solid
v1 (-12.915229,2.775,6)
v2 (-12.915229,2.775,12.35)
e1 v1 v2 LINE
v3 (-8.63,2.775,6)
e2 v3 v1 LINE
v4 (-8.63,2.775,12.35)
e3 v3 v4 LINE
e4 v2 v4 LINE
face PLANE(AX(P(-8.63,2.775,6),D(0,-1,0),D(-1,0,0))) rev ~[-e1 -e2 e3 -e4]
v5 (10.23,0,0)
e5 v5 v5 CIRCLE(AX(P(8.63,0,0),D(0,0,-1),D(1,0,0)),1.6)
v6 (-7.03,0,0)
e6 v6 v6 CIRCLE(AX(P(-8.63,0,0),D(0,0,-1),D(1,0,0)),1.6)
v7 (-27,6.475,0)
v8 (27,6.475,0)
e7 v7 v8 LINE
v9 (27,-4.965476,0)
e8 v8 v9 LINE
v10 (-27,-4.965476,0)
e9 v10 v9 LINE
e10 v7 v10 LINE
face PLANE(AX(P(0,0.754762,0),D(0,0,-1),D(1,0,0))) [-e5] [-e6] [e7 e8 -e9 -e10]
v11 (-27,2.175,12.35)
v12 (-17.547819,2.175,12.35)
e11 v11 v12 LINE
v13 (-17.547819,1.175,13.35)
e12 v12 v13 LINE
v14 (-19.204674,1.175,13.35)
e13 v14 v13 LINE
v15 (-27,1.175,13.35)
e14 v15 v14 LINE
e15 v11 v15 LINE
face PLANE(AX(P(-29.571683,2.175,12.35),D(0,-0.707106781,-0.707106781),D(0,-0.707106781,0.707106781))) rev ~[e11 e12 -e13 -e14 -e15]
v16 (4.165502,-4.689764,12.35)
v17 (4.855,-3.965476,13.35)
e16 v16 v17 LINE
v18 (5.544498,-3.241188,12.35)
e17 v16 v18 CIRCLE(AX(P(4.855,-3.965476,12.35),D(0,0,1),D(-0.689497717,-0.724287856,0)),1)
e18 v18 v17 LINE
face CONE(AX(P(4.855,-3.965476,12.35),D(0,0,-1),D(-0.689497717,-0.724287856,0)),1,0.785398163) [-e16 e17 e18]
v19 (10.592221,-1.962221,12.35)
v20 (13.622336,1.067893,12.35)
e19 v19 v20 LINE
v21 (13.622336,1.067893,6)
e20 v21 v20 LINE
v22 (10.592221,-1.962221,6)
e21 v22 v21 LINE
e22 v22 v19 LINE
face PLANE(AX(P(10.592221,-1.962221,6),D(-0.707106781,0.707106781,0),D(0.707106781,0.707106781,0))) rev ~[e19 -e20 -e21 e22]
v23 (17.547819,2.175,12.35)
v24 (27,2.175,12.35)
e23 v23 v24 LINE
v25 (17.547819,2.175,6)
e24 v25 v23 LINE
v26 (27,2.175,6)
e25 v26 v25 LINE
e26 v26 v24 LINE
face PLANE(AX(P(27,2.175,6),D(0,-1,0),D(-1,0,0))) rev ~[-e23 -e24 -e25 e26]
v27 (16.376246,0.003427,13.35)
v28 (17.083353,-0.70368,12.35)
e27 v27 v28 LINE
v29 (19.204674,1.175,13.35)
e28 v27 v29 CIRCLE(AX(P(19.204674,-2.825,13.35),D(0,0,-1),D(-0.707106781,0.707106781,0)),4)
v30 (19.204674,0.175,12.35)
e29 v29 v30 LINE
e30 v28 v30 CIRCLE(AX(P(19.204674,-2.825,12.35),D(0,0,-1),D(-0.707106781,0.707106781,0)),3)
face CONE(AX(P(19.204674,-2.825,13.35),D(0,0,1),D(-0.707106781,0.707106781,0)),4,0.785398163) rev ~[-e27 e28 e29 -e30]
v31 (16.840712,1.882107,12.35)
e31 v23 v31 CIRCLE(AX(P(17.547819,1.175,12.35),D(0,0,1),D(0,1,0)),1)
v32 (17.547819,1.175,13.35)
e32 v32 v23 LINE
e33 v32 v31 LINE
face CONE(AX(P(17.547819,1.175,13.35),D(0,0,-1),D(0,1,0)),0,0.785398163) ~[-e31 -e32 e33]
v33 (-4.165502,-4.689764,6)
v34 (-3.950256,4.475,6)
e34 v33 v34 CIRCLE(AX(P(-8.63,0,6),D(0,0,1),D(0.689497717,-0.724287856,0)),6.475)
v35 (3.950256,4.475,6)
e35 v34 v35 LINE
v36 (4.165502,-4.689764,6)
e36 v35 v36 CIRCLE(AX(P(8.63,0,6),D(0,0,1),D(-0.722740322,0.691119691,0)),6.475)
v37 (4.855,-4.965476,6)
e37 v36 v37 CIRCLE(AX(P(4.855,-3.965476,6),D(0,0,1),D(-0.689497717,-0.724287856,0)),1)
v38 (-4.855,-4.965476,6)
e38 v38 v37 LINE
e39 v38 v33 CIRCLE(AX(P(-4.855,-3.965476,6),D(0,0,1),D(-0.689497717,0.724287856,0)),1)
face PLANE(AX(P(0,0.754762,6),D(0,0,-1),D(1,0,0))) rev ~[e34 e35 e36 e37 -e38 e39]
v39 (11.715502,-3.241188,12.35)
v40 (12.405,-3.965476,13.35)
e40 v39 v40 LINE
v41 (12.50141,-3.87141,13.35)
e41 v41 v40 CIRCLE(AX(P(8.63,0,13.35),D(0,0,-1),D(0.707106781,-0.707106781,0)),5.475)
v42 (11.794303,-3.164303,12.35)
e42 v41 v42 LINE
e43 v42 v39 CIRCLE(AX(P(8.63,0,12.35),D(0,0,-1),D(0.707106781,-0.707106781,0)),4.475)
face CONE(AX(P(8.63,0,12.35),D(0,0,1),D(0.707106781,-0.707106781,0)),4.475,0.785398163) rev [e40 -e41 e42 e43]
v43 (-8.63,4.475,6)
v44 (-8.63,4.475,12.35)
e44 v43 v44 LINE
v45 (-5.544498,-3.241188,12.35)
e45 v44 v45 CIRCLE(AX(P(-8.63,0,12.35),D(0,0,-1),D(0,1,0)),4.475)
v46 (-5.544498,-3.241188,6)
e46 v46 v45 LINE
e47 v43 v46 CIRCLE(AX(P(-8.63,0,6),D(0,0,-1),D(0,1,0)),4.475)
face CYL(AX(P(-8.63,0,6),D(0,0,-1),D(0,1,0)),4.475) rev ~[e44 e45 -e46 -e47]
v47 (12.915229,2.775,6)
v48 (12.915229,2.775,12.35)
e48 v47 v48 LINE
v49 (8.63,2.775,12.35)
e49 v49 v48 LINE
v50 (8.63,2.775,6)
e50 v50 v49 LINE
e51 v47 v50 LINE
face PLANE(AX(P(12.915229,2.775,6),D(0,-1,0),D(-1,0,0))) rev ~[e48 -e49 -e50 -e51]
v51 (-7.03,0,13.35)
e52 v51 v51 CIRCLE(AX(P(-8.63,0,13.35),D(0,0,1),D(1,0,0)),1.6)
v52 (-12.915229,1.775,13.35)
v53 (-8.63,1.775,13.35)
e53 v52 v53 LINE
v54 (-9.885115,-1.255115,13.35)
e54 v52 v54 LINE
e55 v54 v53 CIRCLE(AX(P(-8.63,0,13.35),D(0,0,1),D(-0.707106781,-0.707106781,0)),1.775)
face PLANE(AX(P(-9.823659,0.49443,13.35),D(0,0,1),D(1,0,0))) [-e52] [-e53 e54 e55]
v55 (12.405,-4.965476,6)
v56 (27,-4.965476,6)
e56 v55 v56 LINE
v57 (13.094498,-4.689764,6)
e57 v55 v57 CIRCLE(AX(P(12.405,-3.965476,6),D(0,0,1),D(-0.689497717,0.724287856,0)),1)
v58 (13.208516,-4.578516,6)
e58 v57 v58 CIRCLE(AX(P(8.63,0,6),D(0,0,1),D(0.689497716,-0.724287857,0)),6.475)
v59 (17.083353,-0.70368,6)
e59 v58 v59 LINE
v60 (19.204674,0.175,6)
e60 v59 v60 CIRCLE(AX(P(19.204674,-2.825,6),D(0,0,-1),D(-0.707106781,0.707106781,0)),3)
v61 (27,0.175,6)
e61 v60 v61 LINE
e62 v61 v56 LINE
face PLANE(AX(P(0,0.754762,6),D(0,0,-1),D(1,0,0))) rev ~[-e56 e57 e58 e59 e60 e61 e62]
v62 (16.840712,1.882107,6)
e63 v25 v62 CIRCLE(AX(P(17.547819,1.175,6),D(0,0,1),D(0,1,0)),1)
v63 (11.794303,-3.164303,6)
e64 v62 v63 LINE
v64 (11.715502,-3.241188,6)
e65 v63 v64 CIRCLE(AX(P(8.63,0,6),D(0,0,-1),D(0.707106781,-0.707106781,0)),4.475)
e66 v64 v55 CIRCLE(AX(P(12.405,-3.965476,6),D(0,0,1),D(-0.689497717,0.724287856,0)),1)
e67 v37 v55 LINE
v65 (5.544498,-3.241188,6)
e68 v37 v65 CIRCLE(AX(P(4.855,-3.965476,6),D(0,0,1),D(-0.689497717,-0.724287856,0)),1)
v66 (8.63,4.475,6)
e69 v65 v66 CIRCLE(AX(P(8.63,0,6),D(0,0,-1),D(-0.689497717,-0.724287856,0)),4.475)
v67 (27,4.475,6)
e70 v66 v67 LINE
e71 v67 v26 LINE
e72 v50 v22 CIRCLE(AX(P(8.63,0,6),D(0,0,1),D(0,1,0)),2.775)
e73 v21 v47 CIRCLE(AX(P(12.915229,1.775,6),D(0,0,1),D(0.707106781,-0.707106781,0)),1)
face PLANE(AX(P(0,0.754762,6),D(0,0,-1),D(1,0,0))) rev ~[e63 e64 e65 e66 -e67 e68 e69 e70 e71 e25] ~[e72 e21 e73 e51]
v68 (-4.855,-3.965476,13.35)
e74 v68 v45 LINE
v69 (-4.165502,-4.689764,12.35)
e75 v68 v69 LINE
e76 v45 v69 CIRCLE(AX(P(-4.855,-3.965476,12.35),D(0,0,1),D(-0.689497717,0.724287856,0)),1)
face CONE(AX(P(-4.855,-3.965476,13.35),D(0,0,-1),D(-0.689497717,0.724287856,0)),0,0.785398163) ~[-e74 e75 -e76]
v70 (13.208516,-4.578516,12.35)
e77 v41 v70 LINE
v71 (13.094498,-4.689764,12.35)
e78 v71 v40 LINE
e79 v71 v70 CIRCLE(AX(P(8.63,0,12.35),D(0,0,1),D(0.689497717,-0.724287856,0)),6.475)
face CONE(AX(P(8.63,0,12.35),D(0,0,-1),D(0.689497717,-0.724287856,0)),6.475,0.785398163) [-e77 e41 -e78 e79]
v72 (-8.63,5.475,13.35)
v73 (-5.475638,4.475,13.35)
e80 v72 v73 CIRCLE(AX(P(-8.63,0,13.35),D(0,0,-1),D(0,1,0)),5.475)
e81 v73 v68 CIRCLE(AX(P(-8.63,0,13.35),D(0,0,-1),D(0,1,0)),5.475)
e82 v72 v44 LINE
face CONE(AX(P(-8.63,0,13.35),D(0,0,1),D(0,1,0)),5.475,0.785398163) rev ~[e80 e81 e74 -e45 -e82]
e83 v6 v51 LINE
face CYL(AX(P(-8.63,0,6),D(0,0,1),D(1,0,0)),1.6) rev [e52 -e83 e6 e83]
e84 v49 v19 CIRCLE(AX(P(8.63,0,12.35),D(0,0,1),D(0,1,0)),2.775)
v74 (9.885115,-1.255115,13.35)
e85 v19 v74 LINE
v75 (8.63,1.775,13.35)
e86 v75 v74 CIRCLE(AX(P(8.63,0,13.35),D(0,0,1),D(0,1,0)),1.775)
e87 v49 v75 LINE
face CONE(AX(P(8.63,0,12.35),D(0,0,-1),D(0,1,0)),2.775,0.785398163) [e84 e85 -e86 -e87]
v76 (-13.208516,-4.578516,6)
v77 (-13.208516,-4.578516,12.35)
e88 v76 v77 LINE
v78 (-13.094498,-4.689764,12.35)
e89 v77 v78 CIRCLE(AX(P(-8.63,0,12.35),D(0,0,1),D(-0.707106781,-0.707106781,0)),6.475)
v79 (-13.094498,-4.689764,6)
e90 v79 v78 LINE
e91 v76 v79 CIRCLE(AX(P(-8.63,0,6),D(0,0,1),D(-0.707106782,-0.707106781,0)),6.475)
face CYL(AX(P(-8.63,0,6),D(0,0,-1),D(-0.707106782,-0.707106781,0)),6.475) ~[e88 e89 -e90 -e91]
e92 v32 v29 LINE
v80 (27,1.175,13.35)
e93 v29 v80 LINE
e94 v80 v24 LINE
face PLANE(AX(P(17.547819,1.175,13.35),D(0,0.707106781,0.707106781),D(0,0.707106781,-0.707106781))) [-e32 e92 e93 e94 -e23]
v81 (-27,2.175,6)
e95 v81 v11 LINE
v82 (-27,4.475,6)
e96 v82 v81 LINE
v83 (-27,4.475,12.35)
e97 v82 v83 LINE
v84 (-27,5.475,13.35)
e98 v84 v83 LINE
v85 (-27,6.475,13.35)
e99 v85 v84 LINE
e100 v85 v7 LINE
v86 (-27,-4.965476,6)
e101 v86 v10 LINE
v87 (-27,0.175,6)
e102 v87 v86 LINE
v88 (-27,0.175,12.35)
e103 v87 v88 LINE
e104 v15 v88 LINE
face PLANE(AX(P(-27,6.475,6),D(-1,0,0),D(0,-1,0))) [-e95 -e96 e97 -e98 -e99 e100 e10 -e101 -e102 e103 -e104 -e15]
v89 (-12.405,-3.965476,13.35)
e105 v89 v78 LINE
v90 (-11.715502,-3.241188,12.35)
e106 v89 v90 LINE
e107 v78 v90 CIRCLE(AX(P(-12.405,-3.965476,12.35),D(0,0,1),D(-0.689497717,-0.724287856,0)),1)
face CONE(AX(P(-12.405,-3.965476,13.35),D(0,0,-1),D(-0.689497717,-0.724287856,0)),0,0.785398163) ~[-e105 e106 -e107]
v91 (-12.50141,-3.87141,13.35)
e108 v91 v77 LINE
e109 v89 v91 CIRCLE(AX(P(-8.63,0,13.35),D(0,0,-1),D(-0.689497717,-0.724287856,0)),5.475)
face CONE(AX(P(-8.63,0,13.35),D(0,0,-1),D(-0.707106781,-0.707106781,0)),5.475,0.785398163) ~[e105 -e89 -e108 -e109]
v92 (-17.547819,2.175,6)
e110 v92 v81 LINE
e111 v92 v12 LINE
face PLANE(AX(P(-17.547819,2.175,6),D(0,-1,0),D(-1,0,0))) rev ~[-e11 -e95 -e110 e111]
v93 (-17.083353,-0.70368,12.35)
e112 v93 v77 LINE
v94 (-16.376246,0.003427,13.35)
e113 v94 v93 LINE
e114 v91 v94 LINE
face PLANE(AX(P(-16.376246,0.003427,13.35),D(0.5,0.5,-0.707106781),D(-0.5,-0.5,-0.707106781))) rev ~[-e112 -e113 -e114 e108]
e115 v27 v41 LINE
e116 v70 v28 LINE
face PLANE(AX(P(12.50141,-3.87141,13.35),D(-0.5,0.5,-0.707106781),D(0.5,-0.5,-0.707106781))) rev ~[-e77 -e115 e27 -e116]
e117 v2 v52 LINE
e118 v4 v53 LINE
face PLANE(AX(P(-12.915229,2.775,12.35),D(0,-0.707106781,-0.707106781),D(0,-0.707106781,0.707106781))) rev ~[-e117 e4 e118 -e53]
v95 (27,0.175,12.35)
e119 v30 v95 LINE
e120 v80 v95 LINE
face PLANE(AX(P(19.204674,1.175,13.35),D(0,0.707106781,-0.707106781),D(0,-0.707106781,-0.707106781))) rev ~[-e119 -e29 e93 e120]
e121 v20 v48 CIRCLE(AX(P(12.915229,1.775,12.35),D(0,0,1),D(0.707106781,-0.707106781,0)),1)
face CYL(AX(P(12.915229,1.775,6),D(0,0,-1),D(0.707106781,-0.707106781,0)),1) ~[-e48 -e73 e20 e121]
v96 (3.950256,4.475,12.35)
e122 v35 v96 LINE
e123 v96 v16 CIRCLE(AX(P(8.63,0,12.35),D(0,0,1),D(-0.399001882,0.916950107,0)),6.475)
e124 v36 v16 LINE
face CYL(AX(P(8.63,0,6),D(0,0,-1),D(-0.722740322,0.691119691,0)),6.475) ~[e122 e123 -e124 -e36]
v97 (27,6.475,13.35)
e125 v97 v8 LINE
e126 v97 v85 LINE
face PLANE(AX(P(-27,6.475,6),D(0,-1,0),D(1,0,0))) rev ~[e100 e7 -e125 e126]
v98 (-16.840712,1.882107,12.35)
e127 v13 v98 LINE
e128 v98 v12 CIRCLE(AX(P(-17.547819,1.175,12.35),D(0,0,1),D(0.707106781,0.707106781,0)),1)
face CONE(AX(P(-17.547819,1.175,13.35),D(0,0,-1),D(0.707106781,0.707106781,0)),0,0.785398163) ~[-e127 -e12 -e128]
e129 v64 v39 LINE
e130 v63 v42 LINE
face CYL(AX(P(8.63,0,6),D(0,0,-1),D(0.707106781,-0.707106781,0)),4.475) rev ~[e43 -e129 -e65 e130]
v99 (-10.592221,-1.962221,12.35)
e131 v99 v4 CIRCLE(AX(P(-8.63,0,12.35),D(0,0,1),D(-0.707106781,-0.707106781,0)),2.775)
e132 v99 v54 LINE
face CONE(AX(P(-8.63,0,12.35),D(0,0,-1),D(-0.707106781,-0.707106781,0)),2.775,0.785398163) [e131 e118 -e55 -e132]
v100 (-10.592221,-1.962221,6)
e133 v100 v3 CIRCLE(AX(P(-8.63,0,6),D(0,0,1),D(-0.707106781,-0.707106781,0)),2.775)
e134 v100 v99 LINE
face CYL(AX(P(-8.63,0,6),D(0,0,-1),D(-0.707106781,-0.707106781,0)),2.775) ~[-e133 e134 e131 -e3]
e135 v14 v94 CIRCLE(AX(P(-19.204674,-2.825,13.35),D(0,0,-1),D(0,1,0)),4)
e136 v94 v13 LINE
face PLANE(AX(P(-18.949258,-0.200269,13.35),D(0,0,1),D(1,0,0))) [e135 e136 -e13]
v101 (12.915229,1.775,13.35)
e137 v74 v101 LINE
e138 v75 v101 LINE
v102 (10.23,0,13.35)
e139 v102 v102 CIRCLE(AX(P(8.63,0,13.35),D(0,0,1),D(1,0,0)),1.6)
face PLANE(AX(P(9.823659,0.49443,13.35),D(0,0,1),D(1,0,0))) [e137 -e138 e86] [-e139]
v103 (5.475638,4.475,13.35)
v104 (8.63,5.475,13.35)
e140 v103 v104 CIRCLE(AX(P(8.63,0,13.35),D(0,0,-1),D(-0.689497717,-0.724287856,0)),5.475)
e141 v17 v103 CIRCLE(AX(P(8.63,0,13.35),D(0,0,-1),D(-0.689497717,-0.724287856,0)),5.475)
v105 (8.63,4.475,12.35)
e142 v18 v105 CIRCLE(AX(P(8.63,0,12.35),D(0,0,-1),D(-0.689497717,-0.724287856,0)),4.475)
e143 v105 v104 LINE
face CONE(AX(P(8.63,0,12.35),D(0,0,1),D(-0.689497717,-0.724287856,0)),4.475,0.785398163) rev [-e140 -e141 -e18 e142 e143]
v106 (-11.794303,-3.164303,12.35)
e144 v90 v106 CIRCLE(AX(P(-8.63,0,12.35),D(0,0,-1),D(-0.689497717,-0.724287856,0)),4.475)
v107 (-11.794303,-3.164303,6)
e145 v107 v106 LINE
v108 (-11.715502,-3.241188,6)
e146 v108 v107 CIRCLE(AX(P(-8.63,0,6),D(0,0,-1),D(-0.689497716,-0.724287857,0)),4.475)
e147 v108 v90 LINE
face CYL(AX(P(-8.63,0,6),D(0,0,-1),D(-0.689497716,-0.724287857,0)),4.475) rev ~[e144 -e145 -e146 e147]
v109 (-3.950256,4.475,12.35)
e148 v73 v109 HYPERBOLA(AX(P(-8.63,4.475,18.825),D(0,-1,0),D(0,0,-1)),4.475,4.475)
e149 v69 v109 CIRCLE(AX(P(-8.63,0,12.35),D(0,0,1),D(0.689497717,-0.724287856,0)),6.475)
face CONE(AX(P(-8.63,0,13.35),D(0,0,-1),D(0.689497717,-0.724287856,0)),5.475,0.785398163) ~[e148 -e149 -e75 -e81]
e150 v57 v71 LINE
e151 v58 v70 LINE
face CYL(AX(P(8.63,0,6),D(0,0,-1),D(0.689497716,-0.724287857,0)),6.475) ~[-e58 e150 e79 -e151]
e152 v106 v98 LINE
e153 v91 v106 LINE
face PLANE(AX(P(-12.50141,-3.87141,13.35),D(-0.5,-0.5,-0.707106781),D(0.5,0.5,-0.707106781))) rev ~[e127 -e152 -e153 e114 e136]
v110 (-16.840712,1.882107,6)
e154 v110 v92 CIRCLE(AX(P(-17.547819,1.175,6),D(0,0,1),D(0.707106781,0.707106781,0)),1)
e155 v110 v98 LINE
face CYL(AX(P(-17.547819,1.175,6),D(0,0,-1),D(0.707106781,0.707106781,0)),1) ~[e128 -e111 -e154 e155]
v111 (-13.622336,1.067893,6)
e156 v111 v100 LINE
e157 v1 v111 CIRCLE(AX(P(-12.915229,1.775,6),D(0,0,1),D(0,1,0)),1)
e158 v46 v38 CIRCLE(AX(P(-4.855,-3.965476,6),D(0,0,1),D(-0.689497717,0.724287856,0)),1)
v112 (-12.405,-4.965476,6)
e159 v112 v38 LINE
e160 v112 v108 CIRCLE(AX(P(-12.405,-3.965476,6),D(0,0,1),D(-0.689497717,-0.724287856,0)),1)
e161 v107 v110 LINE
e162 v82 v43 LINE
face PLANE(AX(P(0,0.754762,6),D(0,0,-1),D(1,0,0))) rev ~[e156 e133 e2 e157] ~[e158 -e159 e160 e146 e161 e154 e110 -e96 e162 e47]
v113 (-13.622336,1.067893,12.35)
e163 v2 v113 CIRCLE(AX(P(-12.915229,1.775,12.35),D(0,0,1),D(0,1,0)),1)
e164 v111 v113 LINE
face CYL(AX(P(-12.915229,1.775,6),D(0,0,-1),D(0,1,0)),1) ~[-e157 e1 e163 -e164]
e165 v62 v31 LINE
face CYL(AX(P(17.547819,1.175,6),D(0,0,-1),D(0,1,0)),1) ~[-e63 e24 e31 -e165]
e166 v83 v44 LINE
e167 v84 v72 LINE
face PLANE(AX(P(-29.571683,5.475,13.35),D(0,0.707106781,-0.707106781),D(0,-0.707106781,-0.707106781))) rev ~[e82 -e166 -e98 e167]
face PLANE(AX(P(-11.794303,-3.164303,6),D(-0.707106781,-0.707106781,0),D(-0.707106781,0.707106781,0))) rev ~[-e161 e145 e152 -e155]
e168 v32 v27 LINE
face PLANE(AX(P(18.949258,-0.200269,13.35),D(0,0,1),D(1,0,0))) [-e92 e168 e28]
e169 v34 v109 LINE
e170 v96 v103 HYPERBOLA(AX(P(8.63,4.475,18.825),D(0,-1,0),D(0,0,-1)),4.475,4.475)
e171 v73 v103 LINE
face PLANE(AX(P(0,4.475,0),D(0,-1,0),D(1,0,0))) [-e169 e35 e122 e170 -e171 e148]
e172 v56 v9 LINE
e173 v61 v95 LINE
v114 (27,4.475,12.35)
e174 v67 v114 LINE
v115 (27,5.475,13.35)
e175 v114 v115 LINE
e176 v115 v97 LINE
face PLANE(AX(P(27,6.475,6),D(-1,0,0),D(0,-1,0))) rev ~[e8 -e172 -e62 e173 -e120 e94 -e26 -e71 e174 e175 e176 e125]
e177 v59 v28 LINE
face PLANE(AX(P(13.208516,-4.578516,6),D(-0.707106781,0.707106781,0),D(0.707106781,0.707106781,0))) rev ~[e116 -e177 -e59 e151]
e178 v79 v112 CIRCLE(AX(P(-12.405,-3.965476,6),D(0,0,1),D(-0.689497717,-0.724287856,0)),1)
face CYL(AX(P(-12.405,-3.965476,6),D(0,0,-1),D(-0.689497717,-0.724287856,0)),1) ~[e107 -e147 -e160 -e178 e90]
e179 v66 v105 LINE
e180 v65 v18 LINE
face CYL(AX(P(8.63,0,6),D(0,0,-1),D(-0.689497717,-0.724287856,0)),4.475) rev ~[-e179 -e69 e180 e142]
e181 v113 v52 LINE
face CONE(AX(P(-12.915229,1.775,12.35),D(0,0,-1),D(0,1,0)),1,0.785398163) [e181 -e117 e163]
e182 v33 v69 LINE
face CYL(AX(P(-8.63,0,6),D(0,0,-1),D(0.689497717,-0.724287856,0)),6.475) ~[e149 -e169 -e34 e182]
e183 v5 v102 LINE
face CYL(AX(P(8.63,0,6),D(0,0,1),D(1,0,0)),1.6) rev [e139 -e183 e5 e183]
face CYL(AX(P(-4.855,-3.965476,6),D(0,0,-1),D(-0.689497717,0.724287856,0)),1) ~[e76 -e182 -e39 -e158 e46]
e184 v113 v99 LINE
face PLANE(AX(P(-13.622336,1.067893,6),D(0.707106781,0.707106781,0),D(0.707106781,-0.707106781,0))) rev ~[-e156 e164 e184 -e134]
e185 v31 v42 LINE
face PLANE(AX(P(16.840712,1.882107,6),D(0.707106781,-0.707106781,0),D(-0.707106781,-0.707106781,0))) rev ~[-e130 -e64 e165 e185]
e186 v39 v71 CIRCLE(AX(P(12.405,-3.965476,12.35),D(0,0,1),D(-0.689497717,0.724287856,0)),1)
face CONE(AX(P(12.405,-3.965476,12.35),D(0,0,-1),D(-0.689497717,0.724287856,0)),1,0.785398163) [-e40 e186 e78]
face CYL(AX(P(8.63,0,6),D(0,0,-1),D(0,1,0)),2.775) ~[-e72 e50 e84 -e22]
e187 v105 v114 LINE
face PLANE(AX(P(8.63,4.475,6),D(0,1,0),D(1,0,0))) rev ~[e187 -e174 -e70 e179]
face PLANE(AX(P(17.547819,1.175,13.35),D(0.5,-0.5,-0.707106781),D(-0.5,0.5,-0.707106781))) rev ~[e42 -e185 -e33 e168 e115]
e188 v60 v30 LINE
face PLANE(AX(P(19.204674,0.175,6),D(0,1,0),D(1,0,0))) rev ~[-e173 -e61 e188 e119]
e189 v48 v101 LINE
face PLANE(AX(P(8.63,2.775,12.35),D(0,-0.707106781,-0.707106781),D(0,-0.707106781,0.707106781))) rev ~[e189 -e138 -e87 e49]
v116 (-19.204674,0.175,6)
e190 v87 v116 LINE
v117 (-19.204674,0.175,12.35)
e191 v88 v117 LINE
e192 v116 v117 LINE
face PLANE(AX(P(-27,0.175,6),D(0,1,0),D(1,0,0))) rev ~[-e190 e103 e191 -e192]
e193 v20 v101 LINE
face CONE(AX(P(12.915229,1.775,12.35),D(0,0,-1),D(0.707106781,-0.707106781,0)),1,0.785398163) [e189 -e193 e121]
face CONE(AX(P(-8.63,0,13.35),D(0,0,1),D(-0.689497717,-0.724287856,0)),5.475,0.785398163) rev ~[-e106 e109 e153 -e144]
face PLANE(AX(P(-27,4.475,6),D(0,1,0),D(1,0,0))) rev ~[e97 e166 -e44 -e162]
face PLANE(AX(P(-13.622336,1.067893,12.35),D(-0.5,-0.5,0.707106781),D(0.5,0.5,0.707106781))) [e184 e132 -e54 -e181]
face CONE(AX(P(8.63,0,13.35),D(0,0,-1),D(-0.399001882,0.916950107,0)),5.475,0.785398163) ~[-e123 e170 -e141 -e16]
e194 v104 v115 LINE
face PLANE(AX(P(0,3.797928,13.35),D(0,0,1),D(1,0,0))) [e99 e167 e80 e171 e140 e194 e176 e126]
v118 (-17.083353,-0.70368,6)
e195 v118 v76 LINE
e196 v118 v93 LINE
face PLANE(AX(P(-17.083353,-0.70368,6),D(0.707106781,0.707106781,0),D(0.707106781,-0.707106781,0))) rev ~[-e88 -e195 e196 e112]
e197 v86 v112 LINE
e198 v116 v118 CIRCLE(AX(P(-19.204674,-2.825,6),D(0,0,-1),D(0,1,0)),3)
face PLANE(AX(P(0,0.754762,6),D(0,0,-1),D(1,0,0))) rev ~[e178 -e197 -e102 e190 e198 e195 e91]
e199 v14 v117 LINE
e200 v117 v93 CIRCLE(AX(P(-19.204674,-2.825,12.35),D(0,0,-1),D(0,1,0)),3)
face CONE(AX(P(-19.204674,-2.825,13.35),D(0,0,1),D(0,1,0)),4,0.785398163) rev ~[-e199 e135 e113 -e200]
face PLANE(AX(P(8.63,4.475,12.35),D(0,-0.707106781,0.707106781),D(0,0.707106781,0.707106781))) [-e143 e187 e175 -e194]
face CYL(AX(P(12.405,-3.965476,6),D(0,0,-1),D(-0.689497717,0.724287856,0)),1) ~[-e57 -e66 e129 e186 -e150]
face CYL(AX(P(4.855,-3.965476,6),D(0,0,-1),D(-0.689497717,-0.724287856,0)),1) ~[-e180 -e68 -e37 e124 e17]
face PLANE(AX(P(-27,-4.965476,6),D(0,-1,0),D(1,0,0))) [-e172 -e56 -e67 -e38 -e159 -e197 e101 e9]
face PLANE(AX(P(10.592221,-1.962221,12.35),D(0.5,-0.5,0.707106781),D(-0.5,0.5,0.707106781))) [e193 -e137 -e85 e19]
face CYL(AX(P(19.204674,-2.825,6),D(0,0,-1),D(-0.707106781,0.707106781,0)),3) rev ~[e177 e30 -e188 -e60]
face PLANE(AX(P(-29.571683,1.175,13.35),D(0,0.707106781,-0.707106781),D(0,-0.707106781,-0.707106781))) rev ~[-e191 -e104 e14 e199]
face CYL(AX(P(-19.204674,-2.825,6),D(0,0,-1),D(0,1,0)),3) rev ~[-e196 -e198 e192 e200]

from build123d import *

# Parameters (mm, degrees)
F2_DEPTH     = 7.35
F1_R         = 1.6
F3_W         = 54
F3_H         = 11.4404760118
F3_R         = 1.6
F4_DEPTH     = 6
F5_T1_DEPTH  = 12.023863734
F5_T3_DEPTH  = 20.941682988
F5_T5_DEPTH  = 20.941682988
F5_T7_DEPTH  = 12.023863734
F5_T9_DEPTH  = 4.2852290732
F5_T11_DEPTH = 4.2852290732
F5_T13_DEPTH = 4.2852290732
F5_T15_DEPTH = 4.2852290732
F5_T17_DEPTH = 7.1367009358
F5_T19_DEPTH = 5.4798466863
F5_T21_DEPTH = 10.3670094845
F5_T23_DEPTH = 7.1367009358
F5_T25_DEPTH = 5.4798466863
F5_T27_DEPTH = 10.3670094845
F5_T30_ANGLE = 135
F5_T32_ANGLE = 225
F5_T34_ANGLE = 225
F5_T36_ANGLE = 135
F5_T38_ANGLE = 45
F5_T40_ANGLE = 1.4096380503
F5_T42_ANGLE = 180
F5_T44_ANGLE = 1.4096380503
F5_T46_ANGLE = 45
F5_T48_ANGLE = 136.4096380503
F5_T50_ANGLE = 180
F5_T54_ANGLE = 112.8938419293
F5_T57_ANGLE = 136.4096380503
F5_T59_ANGLE = 180
F5_T63_ANGLE = 112.8938419293
F5_T66_ANGLE = 45
F5_T68_ANGLE = 1.4096380503
F5_T70_ANGLE = 180
F5_T72_ANGLE = 1.4096380503
F5_T74_ANGLE = 45


# Not quite as in the source:
# - a fillet or chamfer that OpenCascade refuses, or shapes differently, is made with other operations: its cross-section is extruded or revolved along the edge and cut away or added


with BuildPart() as f2:
    # F1 (on offset) → F2 (new body)
    with BuildSketch(Plane.XY.offset(6)):
        with BuildLine():
            Line((27, 6.475), (-27, 6.475))
            Line((-27, 6.475), (-27, 4.475))
            Line((-27, 4.475), (-8.63, 4.475))
            ThreePointArc((-8.63, 4.475), (-4.474886163, 1.6615215923), (-5.5444977169, -3.2411881557))
            ThreePointArc((-5.5444977169, -3.2411881557), (-5.579287856, -4.6549737287), (-4.1655022831, -4.6897638678))
            ThreePointArc((-4.1655022831, -4.6897638678), (-2.1567850781, -0.1520314948), (-3.9502564173, 4.475))
            Line((-3.9502564173, 4.475), (3.9502564173, 4.475))
            ThreePointArc((3.9502564173, 4.475), (2.1567850781, -0.1520314948), (4.1655022831, -4.6897638678))
            ThreePointArc((4.1655022831, -4.6897638678), (5.579287856, -4.6549737287), (5.5444977169, -3.2411881557))
            ThreePointArc((5.5444977169, -3.2411881557), (4.474886163, 1.6615215923), (8.63, 4.475))
            Line((8.63, 4.475), (27, 4.475))
            Line((27, 4.475), (27, 6.475))
        make_face()
    extrude(amount=F2_DEPTH)



with BuildPart() as f2b:
    # F1 (on offset) → F2, piece 2 (new body)
    with BuildSketch(Plane.XY.offset(6)):
        with BuildLine():
            Line((-13.6223358544, 1.0678932188), (-10.5922213178, -1.9622213178))
            ThreePointArc((-10.5922213178, -1.9622213178), (-6.0662342973, -1.0619465248), (-8.63, 2.775))
            Line((-8.63, 2.775), (-12.9152290732, 2.775))
            ThreePointArc((-12.9152290732, 2.775), (-13.8391086057, 2.1576834324), (-13.6223358544, 1.0678932188))
        make_face()
        with Locations((-8.63, 0)):
            Circle(F1_R, mode=Mode.SUBTRACT)
    extrude(amount=F2_DEPTH)


with BuildPart() as f2c:
    # F1 (on offset) → F2, piece 3 (new body)
    with BuildSketch(Plane.XY.offset(6)):
        with BuildLine():
            ThreePointArc((8.63, 2.775), (6.0662342973, -1.0619465248), (10.5922213178, -1.9622213178))
            Line((10.5922213178, -1.9622213178), (13.6223358544, 1.0678932188))
            ThreePointArc((13.6223358544, 1.0678932188), (13.8391086057, 2.1576834324), (12.9152290732, 2.775))
            Line((12.9152290732, 2.775), (8.63, 2.775))
        make_face()
        with Locations((8.63, 0)):
            Circle(F1_R, mode=Mode.SUBTRACT)
    extrude(amount=F2_DEPTH)


with BuildPart() as f2d:
    # F1 (on offset) → F2, piece 4 (new body)
    with BuildSketch(Plane.XY.offset(6)):
        with BuildLine():
            Line((-17.547819254, 2.175), (-27, 2.175))
            Line((-27, 2.175), (-27, 0.175))
            Line((-27, 0.175), (-19.2046735035, 0.175))
            ThreePointArc((-19.2046735035, 0.175), (-18.0566232064, -0.0533614025), (-17.0833531599, -0.7036796564))
            Line((-17.0833531599, -0.7036796564), (-13.2085164082, -4.5785164082))
            ThreePointArc((-13.2085164082, -4.5785164082), (-13.1518491921, -4.6344907902), (-13.0944977169, -4.6897638678))
            ThreePointArc((-13.0944977169, -4.6897638678), (-11.680712144, -4.6549737287), (-11.7155022831, -3.2411881557))
            ThreePointArc((-11.7155022831, -3.2411881557), (-11.7551390169, -3.2029878434), (-11.7943028458, -3.1643028458))
            Line((-11.7943028458, -3.1643028458), (-16.8407124728, 1.8821067812))
            ThreePointArc((-16.8407124728, 1.8821067812), (-17.1651358216, 2.0988795325), (-17.547819254, 2.175))
        make_face()
    extrude(amount=F2_DEPTH)


with BuildPart() as f2e:
    # F1 (on offset) → F2, piece 5 (new body)
    with BuildSketch(Plane.XY.offset(6)):
        with BuildLine():
            ThreePointArc((13.0944977169, -4.6897638678), (13.1518491921, -4.6344907902), (13.2085164082, -4.5785164082))
            Line((13.2085164082, -4.5785164082), (17.0833531599, -0.7036796564))
            ThreePointArc((17.0833531599, -0.7036796564), (18.0566232064, -0.0533614025), (19.2046735035, 0.175))
            Line((19.2046735035, 0.175), (27, 0.175))
            Line((27, 0.175), (27, 2.175))
            Line((27, 2.175), (17.547819254, 2.175))
            ThreePointArc((17.547819254, 2.175), (17.1651358216, 2.0988795325), (16.8407124728, 1.8821067812))
            Line((16.8407124728, 1.8821067812), (11.7943028458, -3.1643028458))
            ThreePointArc((11.7943028458, -3.1643028458), (11.7551390169, -3.2029878434), (11.7155022831, -3.2411881557))
            ThreePointArc((11.7155022831, -3.2411881557), (11.680712144, -4.6549737287), (13.0944977169, -4.6897638678))
        make_face()
    extrude(amount=F2_DEPTH)


with BuildPart() as f2_1:
    add(f2.part)

    add(f2b.part)  # F4 merges F2b

    add(f2c.part)  # F4 merges F2c

    add(f2d.part)  # F4 merges F2d

    add(f2e.part)  # F4 merges F2e
    # F3 (on face) → F4 (join, through all)
    with BuildSketch(Plane(origin=(0, 0, 6), x_dir=(1, 0, 0), z_dir=(0, 0, -1))):
        with Locations((0, -0.7547619941)):
            Rectangle(F3_W, F3_H)
        with Locations((-8.63, 0)):
            Circle(F3_R, mode=Mode.SUBTRACT)
        with Locations((8.63, 0)):
            Circle(F3_R, mode=Mode.SUBTRACT)
    extrude(amount=F4_DEPTH)

    # F5: chamfer of 1 on 6 edges, made by hand

    # F5_s2 → F5_t1 (cut)
    with BuildSketch(Plane.YZ.offset(-29.571682988)):
        Polygon((2.175, 12.35), (1.175, 13.35), (2.175, 13.35), align=None)
    extrude(amount=F5_T1_DEPTH, mode=Mode.SUBTRACT)

    # F5_s4 → F5_t3 (cut)
    with BuildSketch(Plane.YZ.offset(-29.571682988)):
        Polygon((5.475, 13.35), (4.475, 12.35), (4.475, 13.35), align=None)
    extrude(amount=F5_T3_DEPTH, mode=Mode.SUBTRACT)

    # F5_s6 → F5_t5 (cut)
    with BuildSketch(Plane.YZ.offset(8.63)):
        Polygon((4.475, 12.35), (5.475, 13.35), (4.475, 13.35), align=None)
    extrude(amount=F5_T5_DEPTH, mode=Mode.SUBTRACT)

    # F5_s8 → F5_t7 (cut)
    with BuildSketch(Plane.YZ.offset(17.547819254)):
        Polygon((1.175, 13.35), (2.175, 12.35), (2.175, 13.35), align=None)
    extrude(amount=F5_T7_DEPTH, mode=Mode.SUBTRACT)

    # F5_s10 → F5_t9 (cut)
    with BuildSketch(Plane.YZ.offset(-12.9152290732)):
        Polygon((2.775, 12.35), (1.775, 13.35), (2.775, 13.35), align=None)
    extrude(amount=F5_T9_DEPTH, mode=Mode.SUBTRACT)

    # F5_s12 → F5_t11 (cut)
    with BuildSketch(Plane.YZ.offset(8.63)):
        Polygon((2.775, 12.35), (1.775, 13.35), (2.775, 13.35), align=None)
    extrude(amount=F5_T11_DEPTH, mode=Mode.SUBTRACT)

    # F5_s14 → F5_t13 (cut)
    with BuildSketch(Plane(origin=(4.315, 4.315, 0), x_dir=(0, 0, 1), z_dir=(0.7071067812, 0.7071067812, 0))):
        Polygon((12.35, 8.8773315216), (13.35, 7.8773315216), (13.35, 8.8773315216), align=None)
    extrude(amount=F5_T13_DEPTH, mode=Mode.SUBTRACT)

    # F5_s16 → F5_t15 (cut)
    with BuildSketch(Plane(origin=(-7.3451145366, 7.3451145366, 0), x_dir=(0, 0, 1), z_dir=(0.7071067812, -0.7071067812, 0))):
        Polygon((12.35, 8.8773315216), (13.35, 7.8773315216), (13.35, 8.8773315216), align=None)
    extrude(amount=F5_T15_DEPTH, mode=Mode.SUBTRACT)

    # F5_s18 → F5_t17 (cut)
    with BuildSketch(Plane(origin=(9.361409627, 9.361409627, 0), x_dir=(0, 0, 1), z_dir=(-0.7071067812, -0.7071067812, 0))):
        Polygon((13.35, -11.5773315216), (12.35, -10.5773315216), (13.35, -10.5773315216), align=None)
    extrude(amount=F5_T17_DEPTH, mode=Mode.SUBTRACT)

    # F5_s20 → F5_t19 (cut)
    with BuildSketch(Plane(origin=(4.315, 4.315, 0), x_dir=(0, 0, 1), z_dir=(0.7071067812, 0.7071067812, 0))):
        Polygon((13.35, 11.5773315216), (12.35, 12.5773315216), (13.35, 12.5773315216), align=None)
    extrude(amount=F5_T19_DEPTH, mode=Mode.SUBTRACT)

    # F5_s22 → F5_t21 (cut)
    with BuildSketch(Plane.YZ.offset(19.2046735035)):
        Polygon((1.175, 13.35), (0.175, 12.35), (0.175, 13.35), align=None)
    extrude(amount=F5_T21_DEPTH, mode=Mode.SUBTRACT)

    # F5_s24 → F5_t23 (cut)
    with BuildSketch(Plane(origin=(-4.315, 4.315, 0), x_dir=(0, 0, 1), z_dir=(-0.7071067812, 0.7071067812, 0))):
        Polygon((13.35, -11.5773315216), (12.35, -10.5773315216), (13.35, -10.5773315216), align=None)
    extrude(amount=F5_T23_DEPTH, mode=Mode.SUBTRACT)

    # F5_s26 → F5_t25 (cut)
    with BuildSketch(Plane(origin=(-8.1898367517, 8.1898367517, 0), x_dir=(0, 0, 1), z_dir=(0.7071067812, -0.7071067812, 0))):
        Polygon((13.35, 11.5773315216), (12.35, 12.5773315216), (13.35, 12.5773315216), align=None)
    extrude(amount=F5_T25_DEPTH, mode=Mode.SUBTRACT)

    # F5_s28 → F5_t27 (cut)
    with BuildSketch(Plane.YZ.offset(-29.571682988)):
        Polygon((1.175, 13.35), (0.175, 12.35), (0.175, 13.35), align=None)
    extrude(amount=F5_T27_DEPTH, mode=Mode.SUBTRACT)

    # F5_s29 → F5_t30 (revolve, cut)
    with BuildSketch(Plane(origin=(7.3451145366, 7.3451145366, 0), x_dir=(0, 0, 1), z_dir=(-0.7071067812, -0.7071067812, 0))):
        Polygon((12.35, -8.8773315216), (13.35, -7.8773315216), (13.35, -8.8773315216), align=None)
    revolve(axis=Axis((12.9152290732, 1.775, 13.35), (0, 0, 1)), revolution_arc=F5_T30_ANGLE, mode=Mode.SUBTRACT)

    # F5_s31 → F5_t32 (revolve, cut)
    with BuildSketch(Plane.YZ.offset(8.63)):
        Polygon((2.775, 12.35), (1.775, 13.35), (2.775, 13.35), align=None)
    revolve(axis=Axis((8.63, 0, 13.35), (0, 0, 1)), revolution_arc=F5_T32_ANGLE, mode=Mode.SUBTRACT)

    # F5_s33 → F5_t34 (revolve, cut)
    with BuildSketch(Plane(origin=(-4.315, 4.315, 0), x_dir=(0, 0, 1), z_dir=(-0.7071067812, 0.7071067812, 0))):
        Polygon((12.35, -8.8773315216), (13.35, -7.8773315216), (13.35, -8.8773315216), align=None)
    revolve(axis=Axis((-8.63, 0, 13.35), (0, 0, 1)), revolution_arc=F5_T34_ANGLE, mode=Mode.SUBTRACT)

    # F5_s35 → F5_t36 (revolve, cut)
    with BuildSketch(Plane.YZ.offset(-12.9152290732)):
        Polygon((2.775, 12.35), (1.775, 13.35), (2.775, 13.35), align=None)
    revolve(axis=Axis((-12.9152290732, 1.775, 13.35), (0, 0, 1)), revolution_arc=F5_T36_ANGLE, mode=Mode.SUBTRACT)

    # F5_s37 → F5_t38 (revolve, cut)
    with BuildSketch(Plane.YZ.offset(17.547819254)):
        Polygon((1.175, 13.35), (2.175, 12.35), (2.175, 13.35), align=None)
    revolve(axis=Axis((17.547819254, 1.175, 13.35), (0, 0, 1)), revolution_arc=F5_T38_ANGLE, mode=Mode.SUBTRACT)

    # F5_s39 → F5_t40 (revolve, cut)
    with BuildSketch(Plane(origin=(4.315, 4.315, 0), x_dir=(0, 0, 1), z_dir=(0.7071067812, 0.7071067812, 0))):
        Polygon((12.35, 10.5773315216), (13.35, 11.5773315216), (13.35, 10.5773315216), align=None)
    revolve(axis=Axis((8.63, 0, 13.35), (0, 0, -1)), revolution_arc=F5_T40_ANGLE, mode=Mode.SUBTRACT)

    # F5_s41 → F5_t42 (revolve, cut)
    with BuildSketch(Plane(origin=(4.5272367132, 4.3097773234, 0), x_dir=(0, 0, 1), z_dir=(0.724287856, 0.6894977169, 0))):
        Polygon((12.35, 10.4253652968), (13.35, 11.4253652968), (13.35, 10.4253652968), align=None)
    revolve(axis=Axis((12.405, -3.9654760118, 13.35), (0, 0, 1)), revolution_arc=F5_T42_ANGLE, mode=Mode.SUBTRACT)

    # F5_s43 → F5_t44 (revolve, cut)
    with BuildSketch(Plane(origin=(4.5272367132, 4.3097773234, 0), x_dir=(0, 0, 1), z_dir=(-0.724287856, -0.6894977169, 0))):
        Polygon((12.35, -12.4253652968), (13.35, -11.4253652968), (13.35, -12.4253652968), align=None)
    revolve(axis=Axis((8.63, 0, 13.35), (0, 0, 1)), revolution_arc=F5_T44_ANGLE, mode=Mode.SUBTRACT)

    # F5_s45 → F5_t46 (revolve, cut)
    with BuildSketch(Plane(origin=(8.1898367517, 8.1898367517, 0), x_dir=(0, 0, 1), z_dir=(-0.7071067812, -0.7071067812, 0))):
        Polygon((13.35, -11.5773315216), (12.35, -12.5773315216), (13.35, -12.5773315216), align=None)
    revolve(axis=Axis((19.2046735035, -2.825, 13.35), (0, 0, -1)), revolution_arc=F5_T46_ANGLE, mode=Mode.SUBTRACT)

    # F5_s47 → F5_t48 (revolve, cut)
    with BuildSketch(Plane(origin=(4.5272367132, -4.3097773234, 0), x_dir=(0, 0, 1), z_dir=(0.724287856, -0.6894977169, 0))):
        Polygon((12.35, -1.4753652968), (13.35, -0.4753652968), (13.35, -1.4753652968), align=None)
    revolve(axis=Axis((8.63, 0, 13.35), (0, 0, -1)), revolution_arc=F5_T48_ANGLE, mode=Mode.SUBTRACT)

    # F5_s49 → F5_t50 (revolve, cut)
    with BuildSketch(Plane(origin=(4.5272367132, -4.3097773234, 0), x_dir=(0, 0, 1), z_dir=(-0.724287856, 0.6894977169, 0))):
        Polygon((12.35, -0.5246347032), (13.35, 0.4753652968), (13.35, -0.5246347032), align=None)
    revolve(axis=Axis((4.855, -3.9654760118, 13.35), (0, 0, 1)), revolution_arc=F5_T50_ANGLE, mode=Mode.SUBTRACT)


with BuildPart() as f5_tool52:
    # F5_s53 → F5_t54 (revolve)
    with BuildSketch(Plane(origin=(7.256082409, 3.1574133818, 0), x_dir=(0, 0, 1), z_dir=(0.9169501067, 0.399001882, 0))):
        Polygon((13.35, -2.0316137581), (12.35, -3.0316137581), (13.35, -3.0316137581), align=None)
    revolve(axis=Axis((8.63, 0, 13.35), (0, 0, 1)), revolution_arc=F5_T54_ANGLE)

    split(bisect_by=Plane.XZ.offset(-4.475), keep=Keep.TOP)


with BuildPart() as f2_2:
    add(f2_1.part)

    # F5_t51: cut F5_tool52
    add(f5_tool52.part, mode=Mode.SUBTRACT)

    # F5_s56 → F5_t57 (revolve, cut)
    with BuildSketch(Plane.YZ.offset(-8.63)):
        Polygon((5.475, 13.35), (4.475, 12.35), (4.475, 13.35), align=None)
    revolve(axis=Axis((-8.63, 0, 13.35), (0, 0, -1)), revolution_arc=F5_T57_ANGLE, mode=Mode.SUBTRACT)

    # F5_s58 → F5_t59 (revolve, cut)
    with BuildSketch(Plane(origin=(-4.5272367132, -4.3097773234, 0), x_dir=(0, 0, 1), z_dir=(0.724287856, 0.6894977169, 0))):
        Polygon((13.35, -0.4753652968), (12.35, -1.4753652968), (13.35, -1.4753652968), align=None)
    revolve(axis=Axis((-4.855, -3.9654760118, 13.35), (0, 0, 1)), revolution_arc=F5_T59_ANGLE, mode=Mode.SUBTRACT)


with BuildPart() as f5_tool61:
    # F5_s62 → F5_t63 (revolve)
    with BuildSketch(Plane(origin=(-4.5272367132, -4.3097773234, 0), x_dir=(0, 0, 1), z_dir=(-0.724287856, -0.6894977169, 0))):
        Polygon((13.35, 0.4753652968), (12.35, -0.5246347032), (13.35, -0.5246347032), align=None)
    revolve(axis=Axis((-8.63, 0, 13.35), (0, 0, 1)), revolution_arc=F5_T63_ANGLE)

    split(bisect_by=Plane.XZ.offset(-4.475), keep=Keep.TOP)


with BuildPart() as f2_3:
    add(f2_2.part)

    # F5_t60: cut F5_tool61
    add(f5_tool61.part, mode=Mode.SUBTRACT)

    # F5_s65 → F5_t66 (revolve, cut)
    with BuildSketch(Plane(origin=(-9.361409627, 9.361409627, 0), x_dir=(0, 0, 1), z_dir=(0.7071067812, -0.7071067812, 0))):
        Polygon((13.35, 11.5773315216), (12.35, 10.5773315216), (13.35, 10.5773315216), align=None)
    revolve(axis=Axis((-17.547819254, 1.175, 13.35), (0, 0, 1)), revolution_arc=F5_T66_ANGLE, mode=Mode.SUBTRACT)

    # F5_s67 → F5_t68 (revolve, cut)
    with BuildSketch(Plane(origin=(-4.5272367132, 4.3097773234, 0), x_dir=(0, 0, 1), z_dir=(0.724287856, -0.6894977169, 0))):
        Polygon((13.35, 11.4253652968), (12.35, 10.4253652968), (13.35, 10.4253652968), align=None)
    revolve(axis=Axis((-8.63, 0, 13.35), (0, 0, -1)), revolution_arc=F5_T68_ANGLE, mode=Mode.SUBTRACT)

    # F5_s69 → F5_t70 (revolve, cut)
    with BuildSketch(Plane(origin=(-4.5272367132, 4.3097773234, 0), x_dir=(0, 0, 1), z_dir=(-0.724287856, 0.6894977169, 0))):
        Polygon((13.35, -11.4253652968), (12.35, -12.4253652968), (13.35, -12.4253652968), align=None)
    revolve(axis=Axis((-12.405, -3.9654760118, 13.35), (0, 0, 1)), revolution_arc=F5_T70_ANGLE, mode=Mode.SUBTRACT)

    # F5_s71 → F5_t72 (revolve, cut)
    with BuildSketch(Plane(origin=(-4.315, 4.315, 0), x_dir=(0, 0, 1), z_dir=(-0.7071067812, 0.7071067812, 0))):
        Polygon((13.35, -11.5773315216), (12.35, -12.5773315216), (13.35, -12.5773315216), align=None)
    revolve(axis=Axis((-8.63, 0, 13.35), (0, 0, 1)), revolution_arc=F5_T72_ANGLE, mode=Mode.SUBTRACT)

    # F5_s73 → F5_t74 (revolve, cut)
    with BuildSketch(Plane.YZ.offset(-19.2046735035)):
        Polygon((1.175, 13.35), (0.175, 12.35), (0.175, 13.35), align=None)
    revolve(axis=Axis((-19.2046735035, -2.825, 13.35), (0, 0, -1)), revolution_arc=F5_T74_ANGLE, mode=Mode.SUBTRACT)


solid = f2_3.part
